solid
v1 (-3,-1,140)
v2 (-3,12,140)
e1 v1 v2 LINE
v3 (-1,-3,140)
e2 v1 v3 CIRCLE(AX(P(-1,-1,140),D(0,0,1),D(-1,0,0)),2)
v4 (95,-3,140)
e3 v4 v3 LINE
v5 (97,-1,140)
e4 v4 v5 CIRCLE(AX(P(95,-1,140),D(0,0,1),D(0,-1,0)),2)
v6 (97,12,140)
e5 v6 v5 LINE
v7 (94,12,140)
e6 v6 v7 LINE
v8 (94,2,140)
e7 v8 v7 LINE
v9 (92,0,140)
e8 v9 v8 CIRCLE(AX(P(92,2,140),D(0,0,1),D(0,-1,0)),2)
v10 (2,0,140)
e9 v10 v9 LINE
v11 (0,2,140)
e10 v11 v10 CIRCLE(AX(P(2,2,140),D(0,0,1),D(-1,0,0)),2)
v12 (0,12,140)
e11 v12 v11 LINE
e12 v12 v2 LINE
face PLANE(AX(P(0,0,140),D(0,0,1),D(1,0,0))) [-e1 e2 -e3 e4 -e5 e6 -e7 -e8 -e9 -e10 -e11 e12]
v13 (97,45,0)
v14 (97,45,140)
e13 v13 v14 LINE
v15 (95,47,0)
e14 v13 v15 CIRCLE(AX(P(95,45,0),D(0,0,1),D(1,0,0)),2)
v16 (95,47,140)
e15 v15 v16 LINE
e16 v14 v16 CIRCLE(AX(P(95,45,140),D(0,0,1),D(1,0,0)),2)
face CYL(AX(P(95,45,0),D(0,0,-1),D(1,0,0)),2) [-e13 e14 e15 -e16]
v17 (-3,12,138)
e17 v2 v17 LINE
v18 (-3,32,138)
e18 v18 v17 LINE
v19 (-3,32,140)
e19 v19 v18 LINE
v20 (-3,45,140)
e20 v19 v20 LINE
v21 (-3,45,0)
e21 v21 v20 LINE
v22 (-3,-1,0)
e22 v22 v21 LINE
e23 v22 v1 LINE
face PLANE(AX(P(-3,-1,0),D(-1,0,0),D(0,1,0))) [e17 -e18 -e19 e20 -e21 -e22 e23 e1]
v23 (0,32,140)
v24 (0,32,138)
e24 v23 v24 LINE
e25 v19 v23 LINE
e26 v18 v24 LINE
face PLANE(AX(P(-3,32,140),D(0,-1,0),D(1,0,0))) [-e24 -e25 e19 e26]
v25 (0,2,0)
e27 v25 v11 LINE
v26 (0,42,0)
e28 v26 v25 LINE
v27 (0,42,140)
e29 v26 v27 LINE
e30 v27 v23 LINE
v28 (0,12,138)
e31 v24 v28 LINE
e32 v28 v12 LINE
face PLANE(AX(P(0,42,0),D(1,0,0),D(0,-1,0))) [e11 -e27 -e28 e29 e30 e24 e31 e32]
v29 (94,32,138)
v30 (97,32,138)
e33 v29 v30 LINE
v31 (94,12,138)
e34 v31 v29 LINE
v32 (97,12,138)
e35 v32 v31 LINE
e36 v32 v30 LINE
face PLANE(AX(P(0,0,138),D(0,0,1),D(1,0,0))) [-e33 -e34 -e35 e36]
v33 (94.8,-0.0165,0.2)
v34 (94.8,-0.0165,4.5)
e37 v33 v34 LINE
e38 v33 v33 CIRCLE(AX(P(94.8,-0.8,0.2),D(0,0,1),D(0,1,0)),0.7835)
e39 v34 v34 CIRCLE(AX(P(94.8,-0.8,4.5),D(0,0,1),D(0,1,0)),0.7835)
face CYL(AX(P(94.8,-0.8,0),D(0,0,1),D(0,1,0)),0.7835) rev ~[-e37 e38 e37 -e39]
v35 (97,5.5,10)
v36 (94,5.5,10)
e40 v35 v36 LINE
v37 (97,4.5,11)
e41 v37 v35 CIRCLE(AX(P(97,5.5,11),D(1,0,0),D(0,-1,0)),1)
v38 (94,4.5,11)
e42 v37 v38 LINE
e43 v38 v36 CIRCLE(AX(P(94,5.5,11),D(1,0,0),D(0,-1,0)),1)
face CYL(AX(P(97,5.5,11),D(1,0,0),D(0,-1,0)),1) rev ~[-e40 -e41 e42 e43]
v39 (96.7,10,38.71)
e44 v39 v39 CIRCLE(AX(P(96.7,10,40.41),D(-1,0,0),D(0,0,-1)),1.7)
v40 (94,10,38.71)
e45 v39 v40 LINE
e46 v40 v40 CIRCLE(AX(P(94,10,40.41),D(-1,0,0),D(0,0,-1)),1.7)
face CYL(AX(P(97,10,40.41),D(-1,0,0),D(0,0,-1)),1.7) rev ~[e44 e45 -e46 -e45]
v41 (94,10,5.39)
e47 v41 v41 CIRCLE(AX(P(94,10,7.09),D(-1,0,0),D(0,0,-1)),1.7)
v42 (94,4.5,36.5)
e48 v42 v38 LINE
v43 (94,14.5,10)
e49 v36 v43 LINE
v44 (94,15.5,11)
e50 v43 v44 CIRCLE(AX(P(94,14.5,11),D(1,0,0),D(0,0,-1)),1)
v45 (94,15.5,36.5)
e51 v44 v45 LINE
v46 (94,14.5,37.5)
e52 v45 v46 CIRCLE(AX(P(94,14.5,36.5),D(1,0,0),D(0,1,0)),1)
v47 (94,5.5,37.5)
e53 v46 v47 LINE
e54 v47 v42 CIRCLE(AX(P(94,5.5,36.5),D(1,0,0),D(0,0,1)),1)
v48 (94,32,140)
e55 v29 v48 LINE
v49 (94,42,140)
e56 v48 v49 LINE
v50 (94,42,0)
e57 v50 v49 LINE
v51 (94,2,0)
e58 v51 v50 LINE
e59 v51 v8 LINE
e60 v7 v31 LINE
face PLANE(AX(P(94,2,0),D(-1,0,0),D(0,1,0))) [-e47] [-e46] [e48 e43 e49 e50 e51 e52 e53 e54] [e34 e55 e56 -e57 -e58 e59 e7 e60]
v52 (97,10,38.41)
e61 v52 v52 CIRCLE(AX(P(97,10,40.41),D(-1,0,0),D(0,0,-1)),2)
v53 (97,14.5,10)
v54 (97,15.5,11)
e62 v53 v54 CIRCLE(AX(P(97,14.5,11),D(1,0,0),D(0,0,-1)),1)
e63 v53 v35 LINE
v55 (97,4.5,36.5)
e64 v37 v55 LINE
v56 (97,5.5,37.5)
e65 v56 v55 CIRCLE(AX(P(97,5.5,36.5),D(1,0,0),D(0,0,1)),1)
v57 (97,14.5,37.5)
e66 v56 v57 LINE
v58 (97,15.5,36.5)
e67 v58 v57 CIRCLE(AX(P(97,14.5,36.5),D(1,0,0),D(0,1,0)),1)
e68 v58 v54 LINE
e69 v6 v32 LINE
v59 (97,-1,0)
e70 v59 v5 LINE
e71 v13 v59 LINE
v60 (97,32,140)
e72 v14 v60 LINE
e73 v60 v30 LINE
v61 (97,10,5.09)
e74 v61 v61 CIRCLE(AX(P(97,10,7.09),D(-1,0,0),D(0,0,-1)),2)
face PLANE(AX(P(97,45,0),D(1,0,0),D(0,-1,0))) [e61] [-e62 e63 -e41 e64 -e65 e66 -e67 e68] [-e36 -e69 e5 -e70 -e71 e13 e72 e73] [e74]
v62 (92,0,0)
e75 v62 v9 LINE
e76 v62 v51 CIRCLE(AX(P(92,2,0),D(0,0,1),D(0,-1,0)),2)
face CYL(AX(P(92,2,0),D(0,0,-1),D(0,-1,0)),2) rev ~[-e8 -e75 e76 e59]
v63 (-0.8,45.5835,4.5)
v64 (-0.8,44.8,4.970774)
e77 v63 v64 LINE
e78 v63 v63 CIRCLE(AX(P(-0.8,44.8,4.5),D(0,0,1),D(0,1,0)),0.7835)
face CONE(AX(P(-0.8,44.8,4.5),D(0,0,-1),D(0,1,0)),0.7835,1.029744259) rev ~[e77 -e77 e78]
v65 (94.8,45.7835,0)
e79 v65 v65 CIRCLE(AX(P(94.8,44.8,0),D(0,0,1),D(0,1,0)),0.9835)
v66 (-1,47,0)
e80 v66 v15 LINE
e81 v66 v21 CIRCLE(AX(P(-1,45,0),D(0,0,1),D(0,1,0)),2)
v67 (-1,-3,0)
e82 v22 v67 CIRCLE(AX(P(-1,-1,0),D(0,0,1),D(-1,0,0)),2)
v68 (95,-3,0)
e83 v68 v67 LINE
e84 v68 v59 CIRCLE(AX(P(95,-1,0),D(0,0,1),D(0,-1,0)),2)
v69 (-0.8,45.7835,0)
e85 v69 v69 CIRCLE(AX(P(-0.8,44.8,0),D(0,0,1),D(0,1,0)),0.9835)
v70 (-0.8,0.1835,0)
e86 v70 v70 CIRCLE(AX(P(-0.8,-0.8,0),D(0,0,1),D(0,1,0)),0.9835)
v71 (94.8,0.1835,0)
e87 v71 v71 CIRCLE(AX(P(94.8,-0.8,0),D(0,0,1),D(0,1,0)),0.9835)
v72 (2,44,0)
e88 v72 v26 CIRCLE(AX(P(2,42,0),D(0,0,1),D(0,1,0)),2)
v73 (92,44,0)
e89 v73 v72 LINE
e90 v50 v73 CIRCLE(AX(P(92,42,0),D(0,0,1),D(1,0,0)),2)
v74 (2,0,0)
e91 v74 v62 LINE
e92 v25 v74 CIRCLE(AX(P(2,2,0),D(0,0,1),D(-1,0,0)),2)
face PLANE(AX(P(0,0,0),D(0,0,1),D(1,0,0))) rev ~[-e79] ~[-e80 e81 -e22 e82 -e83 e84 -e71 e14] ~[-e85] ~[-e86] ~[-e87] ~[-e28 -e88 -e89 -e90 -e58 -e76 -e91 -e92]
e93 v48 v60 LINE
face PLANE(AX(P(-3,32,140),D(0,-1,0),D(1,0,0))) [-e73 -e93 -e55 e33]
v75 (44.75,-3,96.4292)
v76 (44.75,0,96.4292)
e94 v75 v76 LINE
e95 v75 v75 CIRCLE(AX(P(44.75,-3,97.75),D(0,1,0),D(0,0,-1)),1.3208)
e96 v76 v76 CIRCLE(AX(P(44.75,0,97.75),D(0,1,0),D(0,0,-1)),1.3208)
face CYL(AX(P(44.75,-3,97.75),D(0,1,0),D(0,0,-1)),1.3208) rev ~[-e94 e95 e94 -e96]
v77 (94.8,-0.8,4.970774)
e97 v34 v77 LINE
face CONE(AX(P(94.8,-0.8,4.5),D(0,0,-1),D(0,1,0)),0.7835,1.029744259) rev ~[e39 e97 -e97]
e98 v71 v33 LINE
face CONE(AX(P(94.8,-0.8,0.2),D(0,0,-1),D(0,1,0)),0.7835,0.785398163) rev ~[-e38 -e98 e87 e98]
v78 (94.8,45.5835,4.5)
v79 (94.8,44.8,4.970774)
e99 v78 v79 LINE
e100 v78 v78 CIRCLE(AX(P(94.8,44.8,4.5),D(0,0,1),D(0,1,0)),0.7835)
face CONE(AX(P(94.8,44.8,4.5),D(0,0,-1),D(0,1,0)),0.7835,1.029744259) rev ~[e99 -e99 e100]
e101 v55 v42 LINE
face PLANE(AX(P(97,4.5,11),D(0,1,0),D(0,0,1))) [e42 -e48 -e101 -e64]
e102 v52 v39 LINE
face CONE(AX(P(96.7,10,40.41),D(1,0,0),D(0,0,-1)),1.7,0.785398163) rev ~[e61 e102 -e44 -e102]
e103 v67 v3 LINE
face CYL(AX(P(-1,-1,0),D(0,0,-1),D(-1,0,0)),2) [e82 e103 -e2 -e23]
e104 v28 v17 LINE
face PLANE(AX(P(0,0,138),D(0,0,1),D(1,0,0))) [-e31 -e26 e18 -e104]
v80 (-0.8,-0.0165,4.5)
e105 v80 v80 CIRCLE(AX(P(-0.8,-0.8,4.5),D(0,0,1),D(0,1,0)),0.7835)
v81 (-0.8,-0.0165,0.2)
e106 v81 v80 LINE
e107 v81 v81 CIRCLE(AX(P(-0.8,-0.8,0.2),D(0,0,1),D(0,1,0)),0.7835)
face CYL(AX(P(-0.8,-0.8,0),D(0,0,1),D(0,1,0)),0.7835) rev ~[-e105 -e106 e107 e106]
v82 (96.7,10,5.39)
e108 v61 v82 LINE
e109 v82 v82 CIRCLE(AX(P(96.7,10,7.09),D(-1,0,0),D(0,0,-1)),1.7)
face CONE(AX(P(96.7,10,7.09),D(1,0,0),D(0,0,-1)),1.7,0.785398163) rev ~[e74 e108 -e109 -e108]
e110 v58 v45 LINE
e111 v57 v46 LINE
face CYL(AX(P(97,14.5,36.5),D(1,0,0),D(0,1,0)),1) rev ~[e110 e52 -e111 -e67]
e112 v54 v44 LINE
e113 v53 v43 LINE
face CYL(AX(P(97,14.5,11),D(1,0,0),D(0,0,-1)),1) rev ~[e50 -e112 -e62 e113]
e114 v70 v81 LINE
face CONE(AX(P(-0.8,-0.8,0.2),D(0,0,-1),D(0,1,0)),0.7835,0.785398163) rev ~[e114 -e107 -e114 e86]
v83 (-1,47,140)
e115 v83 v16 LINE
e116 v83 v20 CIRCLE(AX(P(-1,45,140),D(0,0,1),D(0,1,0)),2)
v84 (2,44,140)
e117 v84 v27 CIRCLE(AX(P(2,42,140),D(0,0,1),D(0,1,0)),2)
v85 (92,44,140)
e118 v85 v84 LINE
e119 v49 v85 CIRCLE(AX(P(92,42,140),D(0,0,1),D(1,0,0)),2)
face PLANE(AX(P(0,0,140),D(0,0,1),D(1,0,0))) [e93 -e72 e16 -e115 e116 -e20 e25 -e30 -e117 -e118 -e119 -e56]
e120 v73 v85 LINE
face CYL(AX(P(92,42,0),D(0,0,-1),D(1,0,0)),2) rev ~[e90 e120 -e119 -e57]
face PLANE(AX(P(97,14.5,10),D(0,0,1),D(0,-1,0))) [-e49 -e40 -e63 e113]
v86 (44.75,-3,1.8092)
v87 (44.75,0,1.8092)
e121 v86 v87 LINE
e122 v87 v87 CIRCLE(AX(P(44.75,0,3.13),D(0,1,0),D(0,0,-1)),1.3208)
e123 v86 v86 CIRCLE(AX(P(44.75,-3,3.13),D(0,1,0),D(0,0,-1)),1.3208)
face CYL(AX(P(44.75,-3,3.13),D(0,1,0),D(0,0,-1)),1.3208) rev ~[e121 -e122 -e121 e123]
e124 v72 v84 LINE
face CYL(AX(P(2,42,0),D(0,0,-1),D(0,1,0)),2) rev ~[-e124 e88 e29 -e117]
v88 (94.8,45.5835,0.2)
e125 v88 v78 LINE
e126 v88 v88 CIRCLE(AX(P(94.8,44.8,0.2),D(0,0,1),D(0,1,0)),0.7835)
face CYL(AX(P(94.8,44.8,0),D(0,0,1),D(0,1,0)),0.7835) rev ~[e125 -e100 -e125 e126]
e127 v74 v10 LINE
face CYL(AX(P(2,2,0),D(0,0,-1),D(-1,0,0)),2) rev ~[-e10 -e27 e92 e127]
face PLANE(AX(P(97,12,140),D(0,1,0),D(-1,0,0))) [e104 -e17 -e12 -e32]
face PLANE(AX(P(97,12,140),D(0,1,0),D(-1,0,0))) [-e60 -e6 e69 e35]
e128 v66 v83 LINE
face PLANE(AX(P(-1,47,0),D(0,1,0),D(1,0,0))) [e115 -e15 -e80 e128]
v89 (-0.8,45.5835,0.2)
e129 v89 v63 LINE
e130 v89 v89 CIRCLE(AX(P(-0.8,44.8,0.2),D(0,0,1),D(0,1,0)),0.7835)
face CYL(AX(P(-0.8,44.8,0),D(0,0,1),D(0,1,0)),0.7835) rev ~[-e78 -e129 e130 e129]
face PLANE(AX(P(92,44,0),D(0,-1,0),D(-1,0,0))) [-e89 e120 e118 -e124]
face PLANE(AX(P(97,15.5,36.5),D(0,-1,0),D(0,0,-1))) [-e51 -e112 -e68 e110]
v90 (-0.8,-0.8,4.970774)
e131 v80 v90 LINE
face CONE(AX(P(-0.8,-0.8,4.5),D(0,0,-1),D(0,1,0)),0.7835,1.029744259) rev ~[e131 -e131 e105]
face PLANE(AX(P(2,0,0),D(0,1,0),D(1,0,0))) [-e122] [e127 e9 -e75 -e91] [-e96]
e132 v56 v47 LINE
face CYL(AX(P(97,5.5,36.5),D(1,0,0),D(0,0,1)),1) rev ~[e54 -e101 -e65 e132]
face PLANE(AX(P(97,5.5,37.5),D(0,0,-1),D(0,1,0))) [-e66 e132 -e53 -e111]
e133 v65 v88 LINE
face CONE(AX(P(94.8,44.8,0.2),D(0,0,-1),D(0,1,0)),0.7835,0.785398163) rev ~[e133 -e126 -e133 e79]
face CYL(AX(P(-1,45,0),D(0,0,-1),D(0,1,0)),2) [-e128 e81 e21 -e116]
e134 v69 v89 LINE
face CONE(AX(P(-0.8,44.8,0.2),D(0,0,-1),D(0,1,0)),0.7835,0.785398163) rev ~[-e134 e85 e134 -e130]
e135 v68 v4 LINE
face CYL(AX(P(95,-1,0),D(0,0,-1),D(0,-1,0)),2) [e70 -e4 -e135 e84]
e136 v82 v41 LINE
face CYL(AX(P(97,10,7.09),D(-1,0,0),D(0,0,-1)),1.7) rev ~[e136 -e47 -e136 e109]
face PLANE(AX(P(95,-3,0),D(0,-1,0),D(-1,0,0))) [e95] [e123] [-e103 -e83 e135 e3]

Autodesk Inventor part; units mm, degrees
ref_plane "YZ Plane" through (0, 0, 0) normal (1, 0, 0) x (0, 1, 0)
ref_plane "XZ Plane" through (0, 0, 0) normal (0, 1, 0) x (-1, 0, 0)
ref_plane "XY Plane" through (0, 0, 0) normal (0, 0, 1) x (1, 0, 0)
sketch "Sketch1" plane through (0, 0, 0) normal (0, 0, 1) x (1, 0, 0)
  line L0 (2, 0) -> (92, 0)
  line L1 (94, 2) -> (94, 42)
  line L2 (92, 44) -> (2, 44)
  line L3 (0, 42) -> (0, 2)
  line L4 (-1, 47) -> (95, 47)
  line L5 (97, 45) -> (97, -1)
  line L6 (95, -3) -> (-1, -3)
  line L7 (-3, -1) -> (-3, 45)
  arc A0 (2, 44) -> (0, 42) centre (2, 42) ccw
  arc A1 (0, 2) -> (2, 0) centre (2, 2) ccw
  arc A2 (92, 0) -> (94, 2) centre (92, 2) ccw
  arc A3 (94, 42) -> (92, 44) centre (92, 42) ccw
  arc A4 (-3, -1) -> (-1, -3) centre (-1, -1) ccw
  arc A5 (-1, 47) -> (-3, 45) centre (-1, 45) ccw
  arc A6 (97, 45) -> (95, 47) centre (95, 45) ccw
  arc A7 (95, -3) -> (97, -1) centre (95, -1) ccw
  point P0 (0, 0)
  point P1 (94, 44)
  point P2 (94, 0)
  point P3 (0, 44)
  point P4 (97, -3)
  point P5 (97, 47)
  point P6 (-3, -3)
  dimension "d0" = 94
  dimension "d1" = 44
  dimension "d2" = 100
  dimension "d3" = 50
  dimension "d4" = 3
  dimension "d5" = 3
  dimension "d6" = 2
  dimension "d9" = 2
extrude "Extrusion1" add sketch "Sketch1" along normal blind 140
sketch "Sketch2" plane through (0, 0, 140) normal (0, 0, 1) x (1, 0, 0)
  line L0 (-3, 45) -> (-3, -1) projected
  line L1 (97, -1) -> (97, 45) projected
  line L2 (-3, 32) -> (97, 32)
  line L3 (97, 32) -> (97, 12)
  line L4 (97, 12) -> (-3, 12)
  line L5 (-3, 12) -> (-3, 32)
  line L6 (-1, -3) -> (95, -3) projected
  line L7 (95, 47) -> (-1, 47) projected
  point P0 (0, 0)
  point P1 (-3, 12)
  dimension "d10" = 20
  dimension "d11" = 15
  dimension "d12" = 50
extrude "Extrusion2" cut sketch "Sketch2" against normal blind 2
sketch "Sketch3" plane through (97, -1, 0) normal (1, 0, 0) x (0, 0, -1)
  line L0 (-11, 5.5) -> (-36.5, 5.5)
  line L1 (-37.5, 6.5) -> (-37.5, 15.5)
  line L2 (-36.5, 16.5) -> (-11, 16.5)
  line L3 (-10, 15.5) -> (-10, 6.5)
  line L4 (0, -2) -> (-140, -2) projected
  line L5 (0, 48) -> (-140, 48) projected
  line L6 (0, 0) -> (0, 46) projected
  arc A0 (-11, 5.5) -> (-10, 6.5) centre (-11, 6.5) ccw
  arc A1 (-10, 15.5) -> (-11, 16.5) centre (-11, 15.5) ccw
  arc A2 (-37.5, 6.5) -> (-36.5, 5.5) centre (-36.5, 6.5) ccw
  arc A3 (-36.5, 16.5) -> (-37.5, 15.5) centre (-36.5, 15.5) ccw
  circle A4 centre (-7.09, 11) radius 1.5
  circle A5 centre (-40.41, 11) radius 1.5
  line L7 (-23.75, 5.5) -> (-23.75, 19.7829) construction
  point P0 (0, 1)
  point P1 (-37.5, 16.5)
  point P2 (-37.5, 5.5)
  point P3 (-10, 16.5)
  dimension "d15" = 27.5
  dimension "d16" = 11
  dimension "d17" = 50
  dimension "d18" = 31.5
  dimension "d19" = 10
  dimension "d20" = 1
  dimension "d21" = 3
  dimension "d22" = 3
  dimension "d23" = 16.66
  dimension "d24" = 16.66
extrude "Extrusion3" cut sketch "Sketch3" against normal blind 10 contours L0 A2 L1 A3 L2 A1 L3 A0
hole "Hole1" at (97, 10, 7.09) at (97, 10, 40.41) direction (-1, 0, 0) diameter 3.4 depth 8.8 tip angle 118 clearance for "Countersunk Flat Head Screw ISO 2009/7046" size "M3" standard "ISO"
chamfer "Chamfer1" distance 0.3 angle 45 2 edges at (97, 10, 8.79) (97, 10, 42.11)
sketch "Sketch5" plane through (-1, -3, 0) normal (0, -1, 0) x (1, 0, 0)
  circle A0 centre (45.75, 3.13) radius 1.5
  circle A1 centre (45.75, 97.75) radius 1.5
  line L0 (98, 0) -> (98, 140) projected
  line L1 (0, 0) -> (96, 0) projected
  point P0 (1, 0)
  dimension "d49" = 3
  dimension "d50" = 3
  dimension "d51" = 94.62
  dimension "d52" = 52.25
  dimension "d53" = 3.13
hole "Hole3" at (44.75, -3, 3.13) at (44.75, -3, 97.75) direction (0, 1, 0) diameter 2.6416 depth 10.979 tip angle 118 thread size "6-32 UNC" class "2B" standard "ANSI Unified Screw Threads"
sketch "Sketch6" plane through (0, 0, 0) normal (0, 0, -1) x (-1, 0, 0)
  circle A0 centre (0.8, -0.8) radius 1
  line L0 (1, -3) -> (-95, -3) construction
  line L1 (-47, -3) -> (-47, -11.0585) construction
  line L2 (3, 45) -> (3, -1) construction
  line L3 (3, 22) -> (17.9543, 22) construction
  circle A1 centre (0.8, 44.8) radius 1
  line L4 (-47, 47) -> (-47, 55.0585) construction
  circle A2 centre (-94.8, -0.8) radius 1
  circle A3 centre (-94.8, 44.8) radius 1
  point P0 (0, 0)
  point P1 (-94, 0)
  point P2 (-97, 45)
  point P3 (-97, -1)
  dimension "d61" = 2
  dimension "d62" = 2.2
  dimension "d63" = 2.2
hole "Hole4" at (-0.8, -0.8, 0) at (-0.8, 44.8, 0) at (94.8, 44.8, 0) at (94.8, -0.8, 0) direction (0, 0, 1) diameter 1.567 depth 4.5 tip angle 118 thread size "M2x0.4" class "6H" standard "ISO Metric profile"
chamfer "Chamfer2" distance 0.2 angle 45 4 edges at (-0.8, -1.5835, 0) (-0.8, 44.0165, 0) (94.8, 44.0165, 0) (94.8, -1.5835, 0)
equation "\"d24\" = d23"
properties part number "obudowa"
